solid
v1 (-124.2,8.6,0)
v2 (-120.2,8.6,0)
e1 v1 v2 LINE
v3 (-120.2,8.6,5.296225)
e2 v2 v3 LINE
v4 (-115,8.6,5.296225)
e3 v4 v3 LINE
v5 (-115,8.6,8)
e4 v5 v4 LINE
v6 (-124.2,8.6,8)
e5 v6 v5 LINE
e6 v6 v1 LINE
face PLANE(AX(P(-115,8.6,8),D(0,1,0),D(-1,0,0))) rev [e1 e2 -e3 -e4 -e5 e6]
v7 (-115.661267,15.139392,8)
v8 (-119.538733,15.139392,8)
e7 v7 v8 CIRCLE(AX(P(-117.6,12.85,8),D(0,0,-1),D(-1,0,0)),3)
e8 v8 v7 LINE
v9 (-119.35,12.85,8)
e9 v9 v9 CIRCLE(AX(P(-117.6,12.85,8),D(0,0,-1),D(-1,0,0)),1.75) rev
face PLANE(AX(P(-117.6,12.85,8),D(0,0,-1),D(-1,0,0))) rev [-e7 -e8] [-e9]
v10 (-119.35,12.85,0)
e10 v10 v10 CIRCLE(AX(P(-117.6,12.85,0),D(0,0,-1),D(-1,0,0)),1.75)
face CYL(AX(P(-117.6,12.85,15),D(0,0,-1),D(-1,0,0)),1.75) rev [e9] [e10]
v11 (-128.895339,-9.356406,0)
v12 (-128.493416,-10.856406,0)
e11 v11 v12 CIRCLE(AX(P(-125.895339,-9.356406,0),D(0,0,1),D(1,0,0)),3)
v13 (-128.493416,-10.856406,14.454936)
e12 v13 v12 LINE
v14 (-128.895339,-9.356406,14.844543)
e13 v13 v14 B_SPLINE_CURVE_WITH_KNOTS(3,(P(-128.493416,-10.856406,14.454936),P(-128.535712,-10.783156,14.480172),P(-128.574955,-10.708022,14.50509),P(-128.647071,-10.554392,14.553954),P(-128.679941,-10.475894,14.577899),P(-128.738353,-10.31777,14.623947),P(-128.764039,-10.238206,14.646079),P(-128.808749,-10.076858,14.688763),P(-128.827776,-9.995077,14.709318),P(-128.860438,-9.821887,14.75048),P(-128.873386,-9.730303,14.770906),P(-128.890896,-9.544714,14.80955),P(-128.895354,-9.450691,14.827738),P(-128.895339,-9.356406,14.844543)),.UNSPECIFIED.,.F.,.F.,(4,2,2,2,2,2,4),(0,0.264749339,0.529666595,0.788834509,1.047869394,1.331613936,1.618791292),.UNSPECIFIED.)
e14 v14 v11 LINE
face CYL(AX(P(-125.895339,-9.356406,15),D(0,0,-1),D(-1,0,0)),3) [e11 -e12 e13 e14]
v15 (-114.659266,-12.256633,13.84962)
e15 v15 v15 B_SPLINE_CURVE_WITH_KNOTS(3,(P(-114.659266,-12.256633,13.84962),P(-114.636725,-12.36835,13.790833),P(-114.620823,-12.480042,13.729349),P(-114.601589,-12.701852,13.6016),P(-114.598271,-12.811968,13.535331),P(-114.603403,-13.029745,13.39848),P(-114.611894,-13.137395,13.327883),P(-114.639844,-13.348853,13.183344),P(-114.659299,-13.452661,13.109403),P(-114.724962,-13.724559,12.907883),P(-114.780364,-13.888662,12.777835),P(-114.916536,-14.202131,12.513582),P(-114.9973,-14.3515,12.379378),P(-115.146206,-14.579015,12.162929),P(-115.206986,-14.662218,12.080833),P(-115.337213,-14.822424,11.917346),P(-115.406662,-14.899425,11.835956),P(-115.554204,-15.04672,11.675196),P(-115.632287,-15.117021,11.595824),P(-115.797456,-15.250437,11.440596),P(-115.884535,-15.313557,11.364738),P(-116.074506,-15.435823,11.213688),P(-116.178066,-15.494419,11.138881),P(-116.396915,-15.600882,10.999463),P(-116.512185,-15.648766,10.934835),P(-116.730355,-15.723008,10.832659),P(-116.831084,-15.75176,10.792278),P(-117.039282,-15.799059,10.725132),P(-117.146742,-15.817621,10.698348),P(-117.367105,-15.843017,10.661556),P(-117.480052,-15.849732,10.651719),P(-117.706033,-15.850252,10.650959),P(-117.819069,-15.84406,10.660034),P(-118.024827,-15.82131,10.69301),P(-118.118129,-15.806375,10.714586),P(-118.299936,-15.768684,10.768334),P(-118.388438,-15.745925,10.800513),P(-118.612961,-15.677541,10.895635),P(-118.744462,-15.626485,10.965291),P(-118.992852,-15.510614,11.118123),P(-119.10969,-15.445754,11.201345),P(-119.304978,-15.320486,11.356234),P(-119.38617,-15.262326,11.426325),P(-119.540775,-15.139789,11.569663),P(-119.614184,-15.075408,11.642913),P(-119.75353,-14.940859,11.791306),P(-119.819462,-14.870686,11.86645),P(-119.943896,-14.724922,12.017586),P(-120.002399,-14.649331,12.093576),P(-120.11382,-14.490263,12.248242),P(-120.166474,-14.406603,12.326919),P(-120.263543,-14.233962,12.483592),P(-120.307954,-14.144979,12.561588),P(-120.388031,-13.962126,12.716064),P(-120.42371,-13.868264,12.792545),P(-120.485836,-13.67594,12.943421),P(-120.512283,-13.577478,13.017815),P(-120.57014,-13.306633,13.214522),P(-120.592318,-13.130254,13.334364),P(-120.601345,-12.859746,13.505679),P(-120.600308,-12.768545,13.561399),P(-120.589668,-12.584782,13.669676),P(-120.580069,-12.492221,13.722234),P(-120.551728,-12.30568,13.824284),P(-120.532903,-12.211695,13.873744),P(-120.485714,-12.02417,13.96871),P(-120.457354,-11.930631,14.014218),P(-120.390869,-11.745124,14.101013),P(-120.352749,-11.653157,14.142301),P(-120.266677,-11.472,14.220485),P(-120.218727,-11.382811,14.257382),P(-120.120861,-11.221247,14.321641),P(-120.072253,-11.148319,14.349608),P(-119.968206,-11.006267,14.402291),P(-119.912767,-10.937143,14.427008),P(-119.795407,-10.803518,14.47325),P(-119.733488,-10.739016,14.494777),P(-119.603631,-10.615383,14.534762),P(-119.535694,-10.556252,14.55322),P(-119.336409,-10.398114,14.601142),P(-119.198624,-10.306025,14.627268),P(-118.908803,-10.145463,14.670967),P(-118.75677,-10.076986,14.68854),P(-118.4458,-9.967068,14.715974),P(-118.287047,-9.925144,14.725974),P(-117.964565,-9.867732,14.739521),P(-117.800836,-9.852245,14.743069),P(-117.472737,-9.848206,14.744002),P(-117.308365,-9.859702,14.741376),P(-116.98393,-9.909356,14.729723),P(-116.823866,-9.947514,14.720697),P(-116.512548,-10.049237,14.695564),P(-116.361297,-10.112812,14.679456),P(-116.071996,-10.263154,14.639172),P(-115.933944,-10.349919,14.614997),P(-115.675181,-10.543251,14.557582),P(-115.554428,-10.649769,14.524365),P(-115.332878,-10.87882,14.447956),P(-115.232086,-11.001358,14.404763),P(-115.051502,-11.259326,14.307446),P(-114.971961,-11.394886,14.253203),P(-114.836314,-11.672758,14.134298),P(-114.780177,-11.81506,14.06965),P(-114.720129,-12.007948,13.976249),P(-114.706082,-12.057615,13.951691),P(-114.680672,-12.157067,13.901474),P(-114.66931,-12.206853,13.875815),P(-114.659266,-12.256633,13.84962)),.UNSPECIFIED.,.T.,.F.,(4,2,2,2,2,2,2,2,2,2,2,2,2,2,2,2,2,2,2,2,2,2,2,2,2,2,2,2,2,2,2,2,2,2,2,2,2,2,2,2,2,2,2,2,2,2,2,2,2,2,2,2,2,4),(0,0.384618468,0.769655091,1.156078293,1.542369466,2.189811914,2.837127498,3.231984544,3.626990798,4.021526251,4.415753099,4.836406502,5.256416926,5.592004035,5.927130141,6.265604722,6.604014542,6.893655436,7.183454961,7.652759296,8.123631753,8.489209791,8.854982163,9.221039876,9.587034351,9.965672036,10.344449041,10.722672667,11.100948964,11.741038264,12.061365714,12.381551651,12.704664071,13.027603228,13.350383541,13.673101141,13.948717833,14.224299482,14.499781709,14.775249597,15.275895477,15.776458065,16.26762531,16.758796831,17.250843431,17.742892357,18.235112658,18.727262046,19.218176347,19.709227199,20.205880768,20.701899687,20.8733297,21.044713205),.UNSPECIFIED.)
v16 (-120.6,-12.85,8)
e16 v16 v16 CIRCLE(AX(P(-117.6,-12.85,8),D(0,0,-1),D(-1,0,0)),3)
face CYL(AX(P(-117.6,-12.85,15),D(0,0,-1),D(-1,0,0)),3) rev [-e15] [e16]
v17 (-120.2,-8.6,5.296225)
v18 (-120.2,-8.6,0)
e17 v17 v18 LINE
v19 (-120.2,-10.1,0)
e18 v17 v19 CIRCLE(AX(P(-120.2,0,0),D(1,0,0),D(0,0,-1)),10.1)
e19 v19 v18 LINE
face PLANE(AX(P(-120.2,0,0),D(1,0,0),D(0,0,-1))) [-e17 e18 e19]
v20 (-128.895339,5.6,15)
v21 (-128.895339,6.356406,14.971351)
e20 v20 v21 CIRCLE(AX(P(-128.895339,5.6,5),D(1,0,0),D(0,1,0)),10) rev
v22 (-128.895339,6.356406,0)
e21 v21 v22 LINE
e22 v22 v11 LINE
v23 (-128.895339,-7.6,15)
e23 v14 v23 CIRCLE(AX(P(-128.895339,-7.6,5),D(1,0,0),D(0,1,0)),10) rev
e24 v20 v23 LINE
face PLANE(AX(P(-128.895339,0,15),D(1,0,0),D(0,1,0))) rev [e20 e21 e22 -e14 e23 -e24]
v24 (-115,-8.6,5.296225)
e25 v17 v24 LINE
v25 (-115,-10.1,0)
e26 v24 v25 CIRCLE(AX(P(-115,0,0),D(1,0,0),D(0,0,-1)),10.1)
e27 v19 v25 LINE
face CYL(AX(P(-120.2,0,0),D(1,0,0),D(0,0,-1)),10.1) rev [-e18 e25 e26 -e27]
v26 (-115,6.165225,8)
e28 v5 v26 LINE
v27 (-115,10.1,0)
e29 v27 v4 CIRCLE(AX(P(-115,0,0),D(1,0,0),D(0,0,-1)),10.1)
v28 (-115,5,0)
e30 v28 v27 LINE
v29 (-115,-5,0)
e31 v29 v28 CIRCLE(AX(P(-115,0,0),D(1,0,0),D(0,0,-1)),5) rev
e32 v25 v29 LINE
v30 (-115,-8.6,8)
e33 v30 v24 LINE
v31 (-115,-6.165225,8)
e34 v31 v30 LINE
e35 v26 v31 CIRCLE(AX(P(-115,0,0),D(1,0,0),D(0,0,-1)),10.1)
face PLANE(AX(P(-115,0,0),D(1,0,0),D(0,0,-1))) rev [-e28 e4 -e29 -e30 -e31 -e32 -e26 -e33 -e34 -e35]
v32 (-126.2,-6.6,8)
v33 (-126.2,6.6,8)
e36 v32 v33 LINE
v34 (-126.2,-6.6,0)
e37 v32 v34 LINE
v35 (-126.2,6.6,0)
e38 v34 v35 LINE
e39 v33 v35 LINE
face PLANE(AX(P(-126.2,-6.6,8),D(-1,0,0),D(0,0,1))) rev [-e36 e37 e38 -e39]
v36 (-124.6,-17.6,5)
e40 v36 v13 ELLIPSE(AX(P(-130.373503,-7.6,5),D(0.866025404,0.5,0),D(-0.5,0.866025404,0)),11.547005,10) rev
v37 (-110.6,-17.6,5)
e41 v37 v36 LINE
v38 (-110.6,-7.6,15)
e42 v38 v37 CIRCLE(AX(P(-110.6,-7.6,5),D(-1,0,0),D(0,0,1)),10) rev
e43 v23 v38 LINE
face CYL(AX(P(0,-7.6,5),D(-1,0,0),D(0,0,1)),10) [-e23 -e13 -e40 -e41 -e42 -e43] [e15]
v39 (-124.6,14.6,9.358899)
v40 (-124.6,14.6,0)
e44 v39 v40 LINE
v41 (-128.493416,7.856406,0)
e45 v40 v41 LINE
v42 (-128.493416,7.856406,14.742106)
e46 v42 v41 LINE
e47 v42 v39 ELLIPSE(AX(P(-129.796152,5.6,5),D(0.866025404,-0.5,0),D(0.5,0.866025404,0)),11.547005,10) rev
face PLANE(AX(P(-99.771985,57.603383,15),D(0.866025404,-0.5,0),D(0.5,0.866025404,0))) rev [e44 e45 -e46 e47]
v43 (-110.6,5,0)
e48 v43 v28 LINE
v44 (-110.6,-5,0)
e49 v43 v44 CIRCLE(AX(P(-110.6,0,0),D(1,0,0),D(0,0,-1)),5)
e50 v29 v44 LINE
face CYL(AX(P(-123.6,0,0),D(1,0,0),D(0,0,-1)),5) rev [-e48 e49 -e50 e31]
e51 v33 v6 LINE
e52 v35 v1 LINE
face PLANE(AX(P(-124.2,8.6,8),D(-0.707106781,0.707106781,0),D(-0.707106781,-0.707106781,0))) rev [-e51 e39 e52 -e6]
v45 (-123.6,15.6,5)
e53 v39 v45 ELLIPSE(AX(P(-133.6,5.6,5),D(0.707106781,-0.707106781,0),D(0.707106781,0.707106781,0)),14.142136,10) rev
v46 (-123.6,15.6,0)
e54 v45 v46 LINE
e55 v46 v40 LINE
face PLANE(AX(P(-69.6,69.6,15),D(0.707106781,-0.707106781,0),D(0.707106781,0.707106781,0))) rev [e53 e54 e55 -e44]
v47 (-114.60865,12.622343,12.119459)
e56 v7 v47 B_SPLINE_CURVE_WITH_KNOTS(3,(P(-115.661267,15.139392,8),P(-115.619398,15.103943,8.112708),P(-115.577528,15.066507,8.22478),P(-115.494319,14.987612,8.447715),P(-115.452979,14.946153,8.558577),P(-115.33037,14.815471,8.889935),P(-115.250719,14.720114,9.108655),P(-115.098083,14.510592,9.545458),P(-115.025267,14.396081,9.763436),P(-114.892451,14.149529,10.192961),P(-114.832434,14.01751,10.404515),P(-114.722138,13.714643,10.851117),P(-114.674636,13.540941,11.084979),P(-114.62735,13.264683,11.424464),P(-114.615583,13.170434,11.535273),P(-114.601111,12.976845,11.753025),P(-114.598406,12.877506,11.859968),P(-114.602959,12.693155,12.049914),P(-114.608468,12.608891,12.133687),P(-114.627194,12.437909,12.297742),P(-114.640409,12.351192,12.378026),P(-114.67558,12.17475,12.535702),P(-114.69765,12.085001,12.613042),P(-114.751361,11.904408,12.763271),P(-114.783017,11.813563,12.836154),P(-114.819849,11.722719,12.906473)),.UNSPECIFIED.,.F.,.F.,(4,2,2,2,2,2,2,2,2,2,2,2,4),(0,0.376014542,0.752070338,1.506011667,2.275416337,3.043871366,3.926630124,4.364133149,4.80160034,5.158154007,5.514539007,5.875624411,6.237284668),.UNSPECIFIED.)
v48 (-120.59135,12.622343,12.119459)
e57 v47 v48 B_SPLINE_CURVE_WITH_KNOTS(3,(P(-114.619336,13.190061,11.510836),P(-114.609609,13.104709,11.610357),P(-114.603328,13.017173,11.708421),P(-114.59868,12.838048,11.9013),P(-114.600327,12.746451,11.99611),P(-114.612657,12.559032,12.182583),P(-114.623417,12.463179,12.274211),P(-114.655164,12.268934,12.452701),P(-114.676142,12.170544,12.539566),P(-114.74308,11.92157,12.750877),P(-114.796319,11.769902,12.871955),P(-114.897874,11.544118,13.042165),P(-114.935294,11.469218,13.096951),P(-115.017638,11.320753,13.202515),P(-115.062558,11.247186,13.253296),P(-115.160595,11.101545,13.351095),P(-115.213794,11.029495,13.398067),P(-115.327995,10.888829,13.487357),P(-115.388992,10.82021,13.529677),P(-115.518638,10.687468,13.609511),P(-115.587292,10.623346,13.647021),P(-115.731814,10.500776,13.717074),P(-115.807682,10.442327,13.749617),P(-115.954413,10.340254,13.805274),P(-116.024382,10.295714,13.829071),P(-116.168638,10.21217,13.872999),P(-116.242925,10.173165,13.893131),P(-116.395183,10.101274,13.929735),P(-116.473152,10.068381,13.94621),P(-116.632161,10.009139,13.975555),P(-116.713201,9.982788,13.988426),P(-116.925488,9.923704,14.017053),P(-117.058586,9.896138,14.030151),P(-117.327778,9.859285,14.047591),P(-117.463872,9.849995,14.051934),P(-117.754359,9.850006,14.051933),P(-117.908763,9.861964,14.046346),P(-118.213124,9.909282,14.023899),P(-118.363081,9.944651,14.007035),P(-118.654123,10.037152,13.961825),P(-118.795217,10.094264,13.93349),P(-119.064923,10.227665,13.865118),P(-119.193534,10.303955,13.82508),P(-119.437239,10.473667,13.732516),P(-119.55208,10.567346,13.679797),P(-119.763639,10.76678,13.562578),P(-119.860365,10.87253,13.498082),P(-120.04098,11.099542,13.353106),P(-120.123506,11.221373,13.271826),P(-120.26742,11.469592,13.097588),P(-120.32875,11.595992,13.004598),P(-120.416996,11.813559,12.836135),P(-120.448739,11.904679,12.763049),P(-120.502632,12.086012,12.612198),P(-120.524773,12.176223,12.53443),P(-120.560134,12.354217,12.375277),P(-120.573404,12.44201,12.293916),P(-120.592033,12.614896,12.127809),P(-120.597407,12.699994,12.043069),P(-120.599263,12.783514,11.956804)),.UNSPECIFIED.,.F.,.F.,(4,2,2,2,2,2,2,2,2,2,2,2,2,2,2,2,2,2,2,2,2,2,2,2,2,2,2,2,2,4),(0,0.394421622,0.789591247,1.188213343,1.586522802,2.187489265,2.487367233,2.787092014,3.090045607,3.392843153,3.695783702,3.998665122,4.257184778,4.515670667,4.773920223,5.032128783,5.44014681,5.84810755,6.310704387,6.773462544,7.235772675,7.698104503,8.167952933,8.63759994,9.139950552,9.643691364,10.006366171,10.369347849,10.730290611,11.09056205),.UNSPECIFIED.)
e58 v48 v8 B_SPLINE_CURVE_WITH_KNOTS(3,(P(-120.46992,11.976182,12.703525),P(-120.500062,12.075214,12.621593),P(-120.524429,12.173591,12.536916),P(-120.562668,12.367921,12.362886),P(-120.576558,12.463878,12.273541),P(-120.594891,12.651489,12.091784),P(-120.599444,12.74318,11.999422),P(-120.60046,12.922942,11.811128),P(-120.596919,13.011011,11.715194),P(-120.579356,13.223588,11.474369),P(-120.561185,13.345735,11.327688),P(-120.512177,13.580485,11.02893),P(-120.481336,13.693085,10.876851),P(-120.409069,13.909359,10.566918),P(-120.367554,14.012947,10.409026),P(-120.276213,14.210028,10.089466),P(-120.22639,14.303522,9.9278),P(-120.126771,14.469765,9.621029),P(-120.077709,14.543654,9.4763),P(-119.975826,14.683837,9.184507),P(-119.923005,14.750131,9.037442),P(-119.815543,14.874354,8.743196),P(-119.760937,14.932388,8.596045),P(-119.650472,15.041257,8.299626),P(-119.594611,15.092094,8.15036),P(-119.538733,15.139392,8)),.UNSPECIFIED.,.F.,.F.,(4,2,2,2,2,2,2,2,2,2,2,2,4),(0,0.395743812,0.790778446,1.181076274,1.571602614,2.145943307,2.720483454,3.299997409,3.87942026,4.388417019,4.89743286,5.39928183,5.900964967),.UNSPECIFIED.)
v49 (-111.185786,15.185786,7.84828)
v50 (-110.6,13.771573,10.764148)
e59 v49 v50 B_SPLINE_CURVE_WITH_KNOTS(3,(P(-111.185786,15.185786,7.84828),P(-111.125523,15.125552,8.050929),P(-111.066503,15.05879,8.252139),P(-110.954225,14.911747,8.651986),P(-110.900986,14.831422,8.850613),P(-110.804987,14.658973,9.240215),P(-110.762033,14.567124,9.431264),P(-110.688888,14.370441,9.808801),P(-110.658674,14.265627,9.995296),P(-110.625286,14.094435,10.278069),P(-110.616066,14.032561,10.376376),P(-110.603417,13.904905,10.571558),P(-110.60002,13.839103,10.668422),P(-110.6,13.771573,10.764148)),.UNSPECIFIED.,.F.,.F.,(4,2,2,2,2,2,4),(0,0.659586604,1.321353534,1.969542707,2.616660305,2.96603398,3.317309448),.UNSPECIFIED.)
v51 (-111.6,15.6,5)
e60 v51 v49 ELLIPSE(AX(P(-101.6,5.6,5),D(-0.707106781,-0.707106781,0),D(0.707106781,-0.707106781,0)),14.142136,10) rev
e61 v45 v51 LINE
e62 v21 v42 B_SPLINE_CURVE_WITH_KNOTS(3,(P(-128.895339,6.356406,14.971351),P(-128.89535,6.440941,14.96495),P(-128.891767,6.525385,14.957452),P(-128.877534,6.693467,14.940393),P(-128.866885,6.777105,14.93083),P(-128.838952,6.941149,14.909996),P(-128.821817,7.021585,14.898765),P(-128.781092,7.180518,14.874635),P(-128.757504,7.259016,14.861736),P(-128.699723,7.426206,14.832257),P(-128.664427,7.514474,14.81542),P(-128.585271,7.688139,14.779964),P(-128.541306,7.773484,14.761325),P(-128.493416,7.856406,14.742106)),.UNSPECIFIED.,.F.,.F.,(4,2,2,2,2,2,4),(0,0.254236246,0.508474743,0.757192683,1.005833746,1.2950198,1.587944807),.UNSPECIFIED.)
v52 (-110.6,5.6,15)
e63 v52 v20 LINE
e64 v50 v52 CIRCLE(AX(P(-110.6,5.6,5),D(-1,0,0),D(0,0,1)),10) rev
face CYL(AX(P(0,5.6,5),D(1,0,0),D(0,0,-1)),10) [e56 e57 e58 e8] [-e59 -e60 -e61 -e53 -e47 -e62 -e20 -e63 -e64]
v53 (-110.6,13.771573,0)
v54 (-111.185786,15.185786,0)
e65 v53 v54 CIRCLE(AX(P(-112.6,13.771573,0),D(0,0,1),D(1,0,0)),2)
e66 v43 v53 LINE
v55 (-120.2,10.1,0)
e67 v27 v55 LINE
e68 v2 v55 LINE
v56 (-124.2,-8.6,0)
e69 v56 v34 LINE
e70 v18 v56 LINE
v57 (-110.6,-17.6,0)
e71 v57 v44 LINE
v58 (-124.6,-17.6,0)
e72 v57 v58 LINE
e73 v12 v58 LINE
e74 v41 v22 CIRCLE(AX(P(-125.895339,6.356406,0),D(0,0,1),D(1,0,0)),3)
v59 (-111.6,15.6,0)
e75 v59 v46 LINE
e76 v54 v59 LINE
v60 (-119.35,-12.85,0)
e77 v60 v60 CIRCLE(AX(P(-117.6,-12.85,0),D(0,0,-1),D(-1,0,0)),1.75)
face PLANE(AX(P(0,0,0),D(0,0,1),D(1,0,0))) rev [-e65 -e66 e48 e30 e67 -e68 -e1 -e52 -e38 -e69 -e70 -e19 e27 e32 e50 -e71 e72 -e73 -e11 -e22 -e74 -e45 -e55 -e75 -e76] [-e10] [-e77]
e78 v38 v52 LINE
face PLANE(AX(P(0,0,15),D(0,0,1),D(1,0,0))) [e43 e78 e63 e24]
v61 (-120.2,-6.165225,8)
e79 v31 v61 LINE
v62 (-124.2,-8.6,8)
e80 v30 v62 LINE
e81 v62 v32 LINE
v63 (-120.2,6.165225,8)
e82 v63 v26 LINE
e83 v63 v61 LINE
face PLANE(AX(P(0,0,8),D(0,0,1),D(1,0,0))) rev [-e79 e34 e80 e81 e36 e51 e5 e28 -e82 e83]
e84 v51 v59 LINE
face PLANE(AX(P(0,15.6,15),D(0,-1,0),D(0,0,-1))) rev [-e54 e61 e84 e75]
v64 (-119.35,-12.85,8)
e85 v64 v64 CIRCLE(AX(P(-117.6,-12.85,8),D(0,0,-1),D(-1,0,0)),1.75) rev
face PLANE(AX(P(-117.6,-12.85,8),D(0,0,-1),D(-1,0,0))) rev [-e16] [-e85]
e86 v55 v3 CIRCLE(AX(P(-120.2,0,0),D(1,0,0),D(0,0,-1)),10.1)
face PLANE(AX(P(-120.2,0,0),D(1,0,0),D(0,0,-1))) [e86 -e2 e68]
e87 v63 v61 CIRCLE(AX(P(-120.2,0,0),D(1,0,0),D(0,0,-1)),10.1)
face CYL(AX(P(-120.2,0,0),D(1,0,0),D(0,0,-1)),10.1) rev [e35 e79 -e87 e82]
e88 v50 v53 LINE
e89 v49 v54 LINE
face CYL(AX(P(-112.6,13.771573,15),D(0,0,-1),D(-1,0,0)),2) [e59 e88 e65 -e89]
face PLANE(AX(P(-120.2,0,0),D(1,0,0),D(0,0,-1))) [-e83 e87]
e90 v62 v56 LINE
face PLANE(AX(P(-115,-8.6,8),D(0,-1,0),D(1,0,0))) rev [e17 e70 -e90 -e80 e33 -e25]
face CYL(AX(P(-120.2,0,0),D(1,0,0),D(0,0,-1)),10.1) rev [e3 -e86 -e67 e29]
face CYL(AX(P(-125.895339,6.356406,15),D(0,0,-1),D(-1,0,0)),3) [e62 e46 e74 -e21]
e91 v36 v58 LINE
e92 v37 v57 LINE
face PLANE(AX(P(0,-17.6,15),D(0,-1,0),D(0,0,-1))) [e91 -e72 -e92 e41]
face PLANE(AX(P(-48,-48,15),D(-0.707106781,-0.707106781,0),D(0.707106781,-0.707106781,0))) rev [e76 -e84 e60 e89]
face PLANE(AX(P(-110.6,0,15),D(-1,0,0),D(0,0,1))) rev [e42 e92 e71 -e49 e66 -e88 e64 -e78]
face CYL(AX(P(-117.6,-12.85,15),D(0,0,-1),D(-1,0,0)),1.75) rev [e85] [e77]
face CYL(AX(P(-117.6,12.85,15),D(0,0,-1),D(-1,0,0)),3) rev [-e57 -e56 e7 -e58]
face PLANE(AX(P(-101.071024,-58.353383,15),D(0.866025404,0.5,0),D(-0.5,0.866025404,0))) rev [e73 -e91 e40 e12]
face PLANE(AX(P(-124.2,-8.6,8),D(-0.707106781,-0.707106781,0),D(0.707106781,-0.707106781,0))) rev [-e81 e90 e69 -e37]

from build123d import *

# Parameters (mm, degrees)
BOSS_EXTRUDE1_DEPTH = 15
SKETCH3_R           = 5
CUT_EXTRUDE1_DEPTH  = 13
CUT_EXTRUDE2_START  = -7
SKETCH4_R           = 10.1
CUT_EXTRUDE2_DEPTH  = 2.6
SKETCH5_R           = 1.75
CUT_EXTRUDE3_DEPTH  = 131.953306572
CUT_EXTRUDE4_START  = -8
SKETCH6_R           = 3
CUT_EXTRUDE4_DEPTH  = 123.953306572
FILLET1_START       = -130
FILLET1_DEPTH       = 19.4
CUT_EXTRUDE5_DEPTH  = 8


with BuildPart() as part:
    # Sketch1 → Boss-Extrude1 (new body)
    with BuildSketch(Plane.XY):
        with BuildLine():
            Line((-124.6, 14.6), (-128.493415545, 7.856406461))
            ThreePointArc((-128.493415545, 7.856406461), (-128.793116813, 7.132863596), (-128.895339334, 6.356406461))
            Line((-128.895339334, 6.356406461), (-128.895339334, -9.356406461))
            ThreePointArc((-128.895339334, -9.356406461), (-128.793116813, -10.132863596), (-128.493415545, -10.856406461))
            Line((-128.493415545, -10.856406461), (-124.6, -17.6))
            Line((-124.6, -17.6), (-110.6, -17.6))
            Line((-110.6, -17.6), (-110.6, -5))
            Line((-110.6, -5), (-110.6, 5))
            Line((-110.6, 5), (-110.6, 13.771572875))
            ThreePointArc((-110.6, 13.771572875), (-110.752240935, 14.53693974), (-111.185786438, 15.185786438))
            Line((-111.185786438, 15.185786438), (-111.6, 15.6))
            Line((-111.6, 15.6), (-123.6, 15.6))
            Line((-123.6, 15.6), (-124.6, 14.6))
        make_face()
    extrude(amount=BOSS_EXTRUDE1_DEPTH)

    # Sketch3 → Cut-Extrude1 (cut)
    with BuildSketch(Plane(origin=(-110.6, 0, 0), x_dir=(0, 0, -1), z_dir=(1, 0, 0))):
        Circle(SKETCH3_R)
    extrude(amount=-CUT_EXTRUDE1_DEPTH, mode=Mode.SUBTRACT)

    # Sketch4 → Cut-Extrude2 (cut, symmetric)
    with BuildSketch(Plane(origin=(-110.6, 0, 0), x_dir=(0, 0, -1), z_dir=(1, 0, 0)).offset(CUT_EXTRUDE2_START)):
        Circle(SKETCH4_R)
    extrude(amount=CUT_EXTRUDE2_DEPTH, both=True, mode=Mode.SUBTRACT)

    # Sketch5 → Cut-Extrude3 (cut, through all)
    with BuildSketch(Plane(origin=(0, 0, 0), x_dir=(-1, 0, 0), z_dir=(0, 0, -1))):
        with Locations((117.6, 12.85)):
            Circle(SKETCH5_R)
        with Locations((117.6, -12.85)):
            Circle(SKETCH5_R)
    extrude(amount=-CUT_EXTRUDE3_DEPTH, mode=Mode.SUBTRACT)

    # Sketch6 → Cut-Extrude4 (cut, through all)
    with BuildSketch(Plane(origin=(0, 0, 0), x_dir=(-1, 0, 0), z_dir=(0, 0, -1)).offset(CUT_EXTRUDE4_START)):
        with Locations((117.6, 12.85)):
            Circle(SKETCH6_R)
        with Locations((117.6, -12.85)):
            Circle(SKETCH6_R)
    extrude(amount=-CUT_EXTRUDE4_DEPTH, mode=Mode.SUBTRACT)

    # Fillet1: read off the stored shape, not the designer's step
    # Fillet1 outline → Fillet1 (cut)
    with BuildSketch(Plane.YZ.offset(FILLET1_START)):
        with BuildLine():
            ThreePointArc((-17.6, 5), (-14.671067812, 12.071067812), (-7.6, 15))
            Line((-7.6, 15), (-17.6, 15))
            Line((-17.6, 15), (-17.6, 5))
        make_face()
        with BuildLine():
            ThreePointArc((5.6, 15), (12.671067812, 12.071067812), (15.6, 5))
            Line((15.6, 5), (15.6, 15))
            Line((15.6, 15), (5.6, 15))
        make_face()
    extrude(amount=FILLET1_DEPTH, mode=Mode.SUBTRACT)

    # Sketch7 → Cut-Extrude5 (cut)
    with BuildSketch(Plane(origin=(0, 0, 0), x_dir=(-1, 0, 0), z_dir=(0, 0, -1))):
        Polygon((115, -8.6), (124.2, -8.6), (126.2, -6.6), (126.2, 6.6), (124.2, 8.6), (115, 8.6), align=None)
    extrude(amount=-CUT_EXTRUDE5_DEPTH, mode=Mode.SUBTRACT)


solid = part.part
